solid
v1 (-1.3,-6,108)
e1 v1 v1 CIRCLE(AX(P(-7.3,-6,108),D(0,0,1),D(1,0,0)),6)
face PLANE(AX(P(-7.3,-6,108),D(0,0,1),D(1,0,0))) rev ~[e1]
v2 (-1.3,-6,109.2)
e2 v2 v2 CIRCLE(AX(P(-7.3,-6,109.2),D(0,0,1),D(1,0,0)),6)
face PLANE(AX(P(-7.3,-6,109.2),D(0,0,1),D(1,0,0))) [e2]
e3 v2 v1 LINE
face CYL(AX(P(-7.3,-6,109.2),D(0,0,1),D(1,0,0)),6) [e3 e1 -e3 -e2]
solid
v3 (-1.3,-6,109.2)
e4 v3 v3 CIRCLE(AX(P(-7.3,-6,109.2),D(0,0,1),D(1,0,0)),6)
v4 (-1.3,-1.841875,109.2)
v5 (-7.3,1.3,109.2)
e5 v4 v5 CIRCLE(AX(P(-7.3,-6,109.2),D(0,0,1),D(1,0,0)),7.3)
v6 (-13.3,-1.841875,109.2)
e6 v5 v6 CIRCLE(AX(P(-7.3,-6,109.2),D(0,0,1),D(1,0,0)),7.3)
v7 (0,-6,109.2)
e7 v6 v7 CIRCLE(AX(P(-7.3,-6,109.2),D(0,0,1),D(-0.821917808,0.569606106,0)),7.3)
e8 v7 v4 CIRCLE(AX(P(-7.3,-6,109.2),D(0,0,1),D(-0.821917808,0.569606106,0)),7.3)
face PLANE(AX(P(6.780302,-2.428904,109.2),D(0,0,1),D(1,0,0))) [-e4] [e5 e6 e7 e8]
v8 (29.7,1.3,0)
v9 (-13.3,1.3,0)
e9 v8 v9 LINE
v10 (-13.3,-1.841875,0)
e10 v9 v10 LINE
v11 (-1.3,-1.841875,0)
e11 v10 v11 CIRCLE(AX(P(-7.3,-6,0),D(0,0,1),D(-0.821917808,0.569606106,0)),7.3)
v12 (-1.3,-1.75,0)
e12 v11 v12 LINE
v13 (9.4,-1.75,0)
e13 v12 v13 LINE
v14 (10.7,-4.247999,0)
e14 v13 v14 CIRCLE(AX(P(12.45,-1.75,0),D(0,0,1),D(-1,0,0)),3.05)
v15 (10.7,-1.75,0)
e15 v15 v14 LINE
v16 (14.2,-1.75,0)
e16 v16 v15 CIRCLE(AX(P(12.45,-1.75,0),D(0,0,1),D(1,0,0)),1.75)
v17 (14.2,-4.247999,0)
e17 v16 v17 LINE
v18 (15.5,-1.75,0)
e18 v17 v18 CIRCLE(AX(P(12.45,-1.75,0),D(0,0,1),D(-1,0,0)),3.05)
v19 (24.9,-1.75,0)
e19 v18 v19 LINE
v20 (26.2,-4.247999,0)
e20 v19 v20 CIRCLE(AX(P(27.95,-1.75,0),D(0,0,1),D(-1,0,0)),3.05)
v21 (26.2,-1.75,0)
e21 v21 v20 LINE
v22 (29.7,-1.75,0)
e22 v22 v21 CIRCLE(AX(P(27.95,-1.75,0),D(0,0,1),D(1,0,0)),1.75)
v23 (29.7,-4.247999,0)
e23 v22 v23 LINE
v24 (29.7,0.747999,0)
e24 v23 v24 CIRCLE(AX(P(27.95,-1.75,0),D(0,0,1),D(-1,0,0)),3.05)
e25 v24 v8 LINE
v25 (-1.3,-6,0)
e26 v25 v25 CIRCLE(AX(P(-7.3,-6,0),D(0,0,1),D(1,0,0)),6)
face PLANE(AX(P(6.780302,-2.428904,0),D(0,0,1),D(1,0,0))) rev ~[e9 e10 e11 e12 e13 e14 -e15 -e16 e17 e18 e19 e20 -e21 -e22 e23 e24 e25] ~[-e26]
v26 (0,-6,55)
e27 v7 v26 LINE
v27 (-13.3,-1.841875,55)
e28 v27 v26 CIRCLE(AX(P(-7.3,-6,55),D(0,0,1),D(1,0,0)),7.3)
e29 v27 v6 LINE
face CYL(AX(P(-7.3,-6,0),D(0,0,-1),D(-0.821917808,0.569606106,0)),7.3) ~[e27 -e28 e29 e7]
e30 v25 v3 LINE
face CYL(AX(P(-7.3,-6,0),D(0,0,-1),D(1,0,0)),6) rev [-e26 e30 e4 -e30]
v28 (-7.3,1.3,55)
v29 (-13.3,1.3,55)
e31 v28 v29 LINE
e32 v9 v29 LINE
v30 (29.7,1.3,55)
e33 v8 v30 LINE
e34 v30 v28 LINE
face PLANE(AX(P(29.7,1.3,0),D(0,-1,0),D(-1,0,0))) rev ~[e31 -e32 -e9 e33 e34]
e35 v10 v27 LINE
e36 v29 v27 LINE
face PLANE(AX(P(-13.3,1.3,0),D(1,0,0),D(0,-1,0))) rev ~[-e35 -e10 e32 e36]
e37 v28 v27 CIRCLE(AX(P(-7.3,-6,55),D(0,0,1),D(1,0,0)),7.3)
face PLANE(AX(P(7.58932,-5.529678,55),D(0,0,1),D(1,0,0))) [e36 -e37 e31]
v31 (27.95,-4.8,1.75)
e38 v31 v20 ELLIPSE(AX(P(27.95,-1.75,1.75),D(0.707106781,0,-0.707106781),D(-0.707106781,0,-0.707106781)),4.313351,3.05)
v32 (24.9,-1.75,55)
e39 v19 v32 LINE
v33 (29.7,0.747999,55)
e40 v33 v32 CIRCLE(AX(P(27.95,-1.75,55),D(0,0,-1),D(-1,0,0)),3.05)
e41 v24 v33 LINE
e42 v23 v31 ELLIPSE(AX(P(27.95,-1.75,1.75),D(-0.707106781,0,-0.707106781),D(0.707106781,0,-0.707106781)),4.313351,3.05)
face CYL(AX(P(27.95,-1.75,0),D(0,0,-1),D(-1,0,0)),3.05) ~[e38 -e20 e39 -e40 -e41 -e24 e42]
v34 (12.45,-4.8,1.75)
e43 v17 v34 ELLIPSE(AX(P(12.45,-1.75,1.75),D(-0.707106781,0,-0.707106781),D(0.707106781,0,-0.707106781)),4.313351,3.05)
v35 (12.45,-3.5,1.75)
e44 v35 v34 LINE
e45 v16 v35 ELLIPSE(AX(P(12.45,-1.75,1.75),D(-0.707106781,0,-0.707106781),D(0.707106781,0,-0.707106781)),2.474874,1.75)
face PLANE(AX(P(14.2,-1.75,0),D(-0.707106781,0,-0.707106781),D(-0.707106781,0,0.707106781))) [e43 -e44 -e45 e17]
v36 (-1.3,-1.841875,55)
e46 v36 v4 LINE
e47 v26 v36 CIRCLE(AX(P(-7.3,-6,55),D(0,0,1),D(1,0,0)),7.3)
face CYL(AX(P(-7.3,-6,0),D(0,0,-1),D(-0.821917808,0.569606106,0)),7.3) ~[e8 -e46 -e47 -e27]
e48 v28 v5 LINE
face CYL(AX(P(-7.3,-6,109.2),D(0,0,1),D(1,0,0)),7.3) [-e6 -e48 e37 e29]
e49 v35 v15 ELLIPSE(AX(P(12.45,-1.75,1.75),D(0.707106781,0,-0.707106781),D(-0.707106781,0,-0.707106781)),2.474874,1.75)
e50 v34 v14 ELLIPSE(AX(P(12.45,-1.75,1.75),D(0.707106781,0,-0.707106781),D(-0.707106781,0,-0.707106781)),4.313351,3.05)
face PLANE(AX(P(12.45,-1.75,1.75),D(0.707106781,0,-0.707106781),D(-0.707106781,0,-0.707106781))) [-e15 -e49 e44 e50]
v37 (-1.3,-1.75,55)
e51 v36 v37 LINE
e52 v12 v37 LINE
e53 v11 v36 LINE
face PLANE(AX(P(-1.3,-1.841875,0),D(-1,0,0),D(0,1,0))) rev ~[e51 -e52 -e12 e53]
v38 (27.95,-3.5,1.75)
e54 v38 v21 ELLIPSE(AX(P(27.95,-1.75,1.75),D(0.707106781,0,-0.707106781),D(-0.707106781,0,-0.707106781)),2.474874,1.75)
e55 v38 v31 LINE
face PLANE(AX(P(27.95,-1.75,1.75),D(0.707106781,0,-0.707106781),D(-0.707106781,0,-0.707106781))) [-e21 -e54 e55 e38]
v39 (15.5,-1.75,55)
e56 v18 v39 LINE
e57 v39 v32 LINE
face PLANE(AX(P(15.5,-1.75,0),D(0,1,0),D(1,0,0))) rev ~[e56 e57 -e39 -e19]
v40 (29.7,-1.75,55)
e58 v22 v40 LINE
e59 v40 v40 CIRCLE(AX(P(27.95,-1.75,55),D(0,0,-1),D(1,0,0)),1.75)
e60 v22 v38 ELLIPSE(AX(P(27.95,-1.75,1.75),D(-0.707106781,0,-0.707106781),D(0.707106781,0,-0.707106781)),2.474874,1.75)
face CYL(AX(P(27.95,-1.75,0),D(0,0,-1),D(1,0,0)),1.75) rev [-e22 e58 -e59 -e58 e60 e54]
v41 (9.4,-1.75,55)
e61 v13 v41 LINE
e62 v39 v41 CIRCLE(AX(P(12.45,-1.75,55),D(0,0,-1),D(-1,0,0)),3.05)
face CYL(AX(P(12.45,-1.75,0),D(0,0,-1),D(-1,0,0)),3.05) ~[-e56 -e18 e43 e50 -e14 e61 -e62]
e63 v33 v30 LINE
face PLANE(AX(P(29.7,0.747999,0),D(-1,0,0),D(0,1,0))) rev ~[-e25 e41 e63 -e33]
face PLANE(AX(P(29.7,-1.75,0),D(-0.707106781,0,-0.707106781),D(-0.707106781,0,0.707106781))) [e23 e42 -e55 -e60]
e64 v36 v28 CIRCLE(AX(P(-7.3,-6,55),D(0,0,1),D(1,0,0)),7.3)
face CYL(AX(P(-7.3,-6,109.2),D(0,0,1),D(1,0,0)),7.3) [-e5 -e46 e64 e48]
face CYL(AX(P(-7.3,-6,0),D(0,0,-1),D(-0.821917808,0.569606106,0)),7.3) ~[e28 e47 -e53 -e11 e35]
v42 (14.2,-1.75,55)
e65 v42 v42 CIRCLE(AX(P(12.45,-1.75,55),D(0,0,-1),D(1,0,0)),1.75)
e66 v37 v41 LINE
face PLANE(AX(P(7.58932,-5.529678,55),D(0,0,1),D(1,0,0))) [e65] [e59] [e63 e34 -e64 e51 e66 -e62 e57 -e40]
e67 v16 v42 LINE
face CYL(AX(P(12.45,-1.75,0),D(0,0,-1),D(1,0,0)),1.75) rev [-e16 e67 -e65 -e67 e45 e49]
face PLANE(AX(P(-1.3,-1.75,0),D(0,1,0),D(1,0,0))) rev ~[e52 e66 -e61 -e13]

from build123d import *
from build123d import SkipClean  # not in build123d's __all__

# Parameters (mm, degrees)
F0_R     = 6
F0_R_2   = 1.75
F1_DEPTH = 109.2
F3_DEPTH = 25
F4_W     = 51.9569627941
F4_H     = 21.8115057796
F4_R     = 7.3
F5_DEPTH = 54.2
F6_R     = 6
F7_DEPTH = 1.2


with BuildPart() as f1:
    # F0 (on Top) → F1 (new body)
    with BuildSketch(Plane.XY):
        with BuildLine():
            Line((-1.3, -1.8418754227), (-1.3, -1.75))
            Line((-1.3, -1.75), (9.4, -1.75))
            ThreePointArc((9.4, -1.75), (12.45, -4.8), (15.5, -1.75))
            Line((15.5, -1.75), (24.9, -1.75))
            ThreePointArc((24.9, -1.75), (29.358012784, -4.4555498517), (29.7, 0.7479991994))
            Line((29.7, 0.7479991994), (29.7, 1.3))
            Line((29.7, 1.3), (-13.3, 1.3))
            Line((-13.3, 1.3), (-13.3, -1.8418754227))
            ThreePointArc((-13.3, -1.8418754227), (-7.3, -13.3), (-1.3, -1.8418754227))
        make_face()
        with Locations((-7.3, -6)):
            Circle(F0_R, mode=Mode.SUBTRACT)
        with Locations((12.45, -1.75)):
            Circle(F0_R_2, mode=Mode.SUBTRACT)
        with Locations((27.95, -1.75)):
            Circle(F0_R_2, mode=Mode.SUBTRACT)
    extrude(amount=F1_DEPTH)

    # F2 (on face) → F3 (cut)
    with BuildSketch(Plane.XZ.offset(1.75)):
        Polygon((12.45, 1.75), (10.7, 0), (14.2, 0), align=None)
        Polygon((27.95, 1.75), (26.2, 0), (29.7, 0), align=None)
    extrude(amount=F3_DEPTH, mode=Mode.SUBTRACT)

    # F4 (on face) → F5 (cut)
    with BuildSketch(Plane.XY.offset(109.2)):
        with Locations((7.5893197209, -5.5296784267)):
            Rectangle(F4_W, F4_H)
        with Locations((-7.3, -6)):
            Circle(F4_R, mode=Mode.SUBTRACT)
    with SkipClean():  # cleaning this boolean's faces spoils the solid; the shape is the same uncleaned
        extrude(amount=-F5_DEPTH, mode=Mode.SUBTRACT)


with BuildPart() as f7:
    # F6 (on face) → F7 (new body)
    with BuildSketch(Plane.XY.offset(109.2)):
        with Locations((-7.3, -6)):
            Circle(F6_R)
    extrude(amount=-F7_DEPTH)


solid = Compound([f1.part, f7.part])
